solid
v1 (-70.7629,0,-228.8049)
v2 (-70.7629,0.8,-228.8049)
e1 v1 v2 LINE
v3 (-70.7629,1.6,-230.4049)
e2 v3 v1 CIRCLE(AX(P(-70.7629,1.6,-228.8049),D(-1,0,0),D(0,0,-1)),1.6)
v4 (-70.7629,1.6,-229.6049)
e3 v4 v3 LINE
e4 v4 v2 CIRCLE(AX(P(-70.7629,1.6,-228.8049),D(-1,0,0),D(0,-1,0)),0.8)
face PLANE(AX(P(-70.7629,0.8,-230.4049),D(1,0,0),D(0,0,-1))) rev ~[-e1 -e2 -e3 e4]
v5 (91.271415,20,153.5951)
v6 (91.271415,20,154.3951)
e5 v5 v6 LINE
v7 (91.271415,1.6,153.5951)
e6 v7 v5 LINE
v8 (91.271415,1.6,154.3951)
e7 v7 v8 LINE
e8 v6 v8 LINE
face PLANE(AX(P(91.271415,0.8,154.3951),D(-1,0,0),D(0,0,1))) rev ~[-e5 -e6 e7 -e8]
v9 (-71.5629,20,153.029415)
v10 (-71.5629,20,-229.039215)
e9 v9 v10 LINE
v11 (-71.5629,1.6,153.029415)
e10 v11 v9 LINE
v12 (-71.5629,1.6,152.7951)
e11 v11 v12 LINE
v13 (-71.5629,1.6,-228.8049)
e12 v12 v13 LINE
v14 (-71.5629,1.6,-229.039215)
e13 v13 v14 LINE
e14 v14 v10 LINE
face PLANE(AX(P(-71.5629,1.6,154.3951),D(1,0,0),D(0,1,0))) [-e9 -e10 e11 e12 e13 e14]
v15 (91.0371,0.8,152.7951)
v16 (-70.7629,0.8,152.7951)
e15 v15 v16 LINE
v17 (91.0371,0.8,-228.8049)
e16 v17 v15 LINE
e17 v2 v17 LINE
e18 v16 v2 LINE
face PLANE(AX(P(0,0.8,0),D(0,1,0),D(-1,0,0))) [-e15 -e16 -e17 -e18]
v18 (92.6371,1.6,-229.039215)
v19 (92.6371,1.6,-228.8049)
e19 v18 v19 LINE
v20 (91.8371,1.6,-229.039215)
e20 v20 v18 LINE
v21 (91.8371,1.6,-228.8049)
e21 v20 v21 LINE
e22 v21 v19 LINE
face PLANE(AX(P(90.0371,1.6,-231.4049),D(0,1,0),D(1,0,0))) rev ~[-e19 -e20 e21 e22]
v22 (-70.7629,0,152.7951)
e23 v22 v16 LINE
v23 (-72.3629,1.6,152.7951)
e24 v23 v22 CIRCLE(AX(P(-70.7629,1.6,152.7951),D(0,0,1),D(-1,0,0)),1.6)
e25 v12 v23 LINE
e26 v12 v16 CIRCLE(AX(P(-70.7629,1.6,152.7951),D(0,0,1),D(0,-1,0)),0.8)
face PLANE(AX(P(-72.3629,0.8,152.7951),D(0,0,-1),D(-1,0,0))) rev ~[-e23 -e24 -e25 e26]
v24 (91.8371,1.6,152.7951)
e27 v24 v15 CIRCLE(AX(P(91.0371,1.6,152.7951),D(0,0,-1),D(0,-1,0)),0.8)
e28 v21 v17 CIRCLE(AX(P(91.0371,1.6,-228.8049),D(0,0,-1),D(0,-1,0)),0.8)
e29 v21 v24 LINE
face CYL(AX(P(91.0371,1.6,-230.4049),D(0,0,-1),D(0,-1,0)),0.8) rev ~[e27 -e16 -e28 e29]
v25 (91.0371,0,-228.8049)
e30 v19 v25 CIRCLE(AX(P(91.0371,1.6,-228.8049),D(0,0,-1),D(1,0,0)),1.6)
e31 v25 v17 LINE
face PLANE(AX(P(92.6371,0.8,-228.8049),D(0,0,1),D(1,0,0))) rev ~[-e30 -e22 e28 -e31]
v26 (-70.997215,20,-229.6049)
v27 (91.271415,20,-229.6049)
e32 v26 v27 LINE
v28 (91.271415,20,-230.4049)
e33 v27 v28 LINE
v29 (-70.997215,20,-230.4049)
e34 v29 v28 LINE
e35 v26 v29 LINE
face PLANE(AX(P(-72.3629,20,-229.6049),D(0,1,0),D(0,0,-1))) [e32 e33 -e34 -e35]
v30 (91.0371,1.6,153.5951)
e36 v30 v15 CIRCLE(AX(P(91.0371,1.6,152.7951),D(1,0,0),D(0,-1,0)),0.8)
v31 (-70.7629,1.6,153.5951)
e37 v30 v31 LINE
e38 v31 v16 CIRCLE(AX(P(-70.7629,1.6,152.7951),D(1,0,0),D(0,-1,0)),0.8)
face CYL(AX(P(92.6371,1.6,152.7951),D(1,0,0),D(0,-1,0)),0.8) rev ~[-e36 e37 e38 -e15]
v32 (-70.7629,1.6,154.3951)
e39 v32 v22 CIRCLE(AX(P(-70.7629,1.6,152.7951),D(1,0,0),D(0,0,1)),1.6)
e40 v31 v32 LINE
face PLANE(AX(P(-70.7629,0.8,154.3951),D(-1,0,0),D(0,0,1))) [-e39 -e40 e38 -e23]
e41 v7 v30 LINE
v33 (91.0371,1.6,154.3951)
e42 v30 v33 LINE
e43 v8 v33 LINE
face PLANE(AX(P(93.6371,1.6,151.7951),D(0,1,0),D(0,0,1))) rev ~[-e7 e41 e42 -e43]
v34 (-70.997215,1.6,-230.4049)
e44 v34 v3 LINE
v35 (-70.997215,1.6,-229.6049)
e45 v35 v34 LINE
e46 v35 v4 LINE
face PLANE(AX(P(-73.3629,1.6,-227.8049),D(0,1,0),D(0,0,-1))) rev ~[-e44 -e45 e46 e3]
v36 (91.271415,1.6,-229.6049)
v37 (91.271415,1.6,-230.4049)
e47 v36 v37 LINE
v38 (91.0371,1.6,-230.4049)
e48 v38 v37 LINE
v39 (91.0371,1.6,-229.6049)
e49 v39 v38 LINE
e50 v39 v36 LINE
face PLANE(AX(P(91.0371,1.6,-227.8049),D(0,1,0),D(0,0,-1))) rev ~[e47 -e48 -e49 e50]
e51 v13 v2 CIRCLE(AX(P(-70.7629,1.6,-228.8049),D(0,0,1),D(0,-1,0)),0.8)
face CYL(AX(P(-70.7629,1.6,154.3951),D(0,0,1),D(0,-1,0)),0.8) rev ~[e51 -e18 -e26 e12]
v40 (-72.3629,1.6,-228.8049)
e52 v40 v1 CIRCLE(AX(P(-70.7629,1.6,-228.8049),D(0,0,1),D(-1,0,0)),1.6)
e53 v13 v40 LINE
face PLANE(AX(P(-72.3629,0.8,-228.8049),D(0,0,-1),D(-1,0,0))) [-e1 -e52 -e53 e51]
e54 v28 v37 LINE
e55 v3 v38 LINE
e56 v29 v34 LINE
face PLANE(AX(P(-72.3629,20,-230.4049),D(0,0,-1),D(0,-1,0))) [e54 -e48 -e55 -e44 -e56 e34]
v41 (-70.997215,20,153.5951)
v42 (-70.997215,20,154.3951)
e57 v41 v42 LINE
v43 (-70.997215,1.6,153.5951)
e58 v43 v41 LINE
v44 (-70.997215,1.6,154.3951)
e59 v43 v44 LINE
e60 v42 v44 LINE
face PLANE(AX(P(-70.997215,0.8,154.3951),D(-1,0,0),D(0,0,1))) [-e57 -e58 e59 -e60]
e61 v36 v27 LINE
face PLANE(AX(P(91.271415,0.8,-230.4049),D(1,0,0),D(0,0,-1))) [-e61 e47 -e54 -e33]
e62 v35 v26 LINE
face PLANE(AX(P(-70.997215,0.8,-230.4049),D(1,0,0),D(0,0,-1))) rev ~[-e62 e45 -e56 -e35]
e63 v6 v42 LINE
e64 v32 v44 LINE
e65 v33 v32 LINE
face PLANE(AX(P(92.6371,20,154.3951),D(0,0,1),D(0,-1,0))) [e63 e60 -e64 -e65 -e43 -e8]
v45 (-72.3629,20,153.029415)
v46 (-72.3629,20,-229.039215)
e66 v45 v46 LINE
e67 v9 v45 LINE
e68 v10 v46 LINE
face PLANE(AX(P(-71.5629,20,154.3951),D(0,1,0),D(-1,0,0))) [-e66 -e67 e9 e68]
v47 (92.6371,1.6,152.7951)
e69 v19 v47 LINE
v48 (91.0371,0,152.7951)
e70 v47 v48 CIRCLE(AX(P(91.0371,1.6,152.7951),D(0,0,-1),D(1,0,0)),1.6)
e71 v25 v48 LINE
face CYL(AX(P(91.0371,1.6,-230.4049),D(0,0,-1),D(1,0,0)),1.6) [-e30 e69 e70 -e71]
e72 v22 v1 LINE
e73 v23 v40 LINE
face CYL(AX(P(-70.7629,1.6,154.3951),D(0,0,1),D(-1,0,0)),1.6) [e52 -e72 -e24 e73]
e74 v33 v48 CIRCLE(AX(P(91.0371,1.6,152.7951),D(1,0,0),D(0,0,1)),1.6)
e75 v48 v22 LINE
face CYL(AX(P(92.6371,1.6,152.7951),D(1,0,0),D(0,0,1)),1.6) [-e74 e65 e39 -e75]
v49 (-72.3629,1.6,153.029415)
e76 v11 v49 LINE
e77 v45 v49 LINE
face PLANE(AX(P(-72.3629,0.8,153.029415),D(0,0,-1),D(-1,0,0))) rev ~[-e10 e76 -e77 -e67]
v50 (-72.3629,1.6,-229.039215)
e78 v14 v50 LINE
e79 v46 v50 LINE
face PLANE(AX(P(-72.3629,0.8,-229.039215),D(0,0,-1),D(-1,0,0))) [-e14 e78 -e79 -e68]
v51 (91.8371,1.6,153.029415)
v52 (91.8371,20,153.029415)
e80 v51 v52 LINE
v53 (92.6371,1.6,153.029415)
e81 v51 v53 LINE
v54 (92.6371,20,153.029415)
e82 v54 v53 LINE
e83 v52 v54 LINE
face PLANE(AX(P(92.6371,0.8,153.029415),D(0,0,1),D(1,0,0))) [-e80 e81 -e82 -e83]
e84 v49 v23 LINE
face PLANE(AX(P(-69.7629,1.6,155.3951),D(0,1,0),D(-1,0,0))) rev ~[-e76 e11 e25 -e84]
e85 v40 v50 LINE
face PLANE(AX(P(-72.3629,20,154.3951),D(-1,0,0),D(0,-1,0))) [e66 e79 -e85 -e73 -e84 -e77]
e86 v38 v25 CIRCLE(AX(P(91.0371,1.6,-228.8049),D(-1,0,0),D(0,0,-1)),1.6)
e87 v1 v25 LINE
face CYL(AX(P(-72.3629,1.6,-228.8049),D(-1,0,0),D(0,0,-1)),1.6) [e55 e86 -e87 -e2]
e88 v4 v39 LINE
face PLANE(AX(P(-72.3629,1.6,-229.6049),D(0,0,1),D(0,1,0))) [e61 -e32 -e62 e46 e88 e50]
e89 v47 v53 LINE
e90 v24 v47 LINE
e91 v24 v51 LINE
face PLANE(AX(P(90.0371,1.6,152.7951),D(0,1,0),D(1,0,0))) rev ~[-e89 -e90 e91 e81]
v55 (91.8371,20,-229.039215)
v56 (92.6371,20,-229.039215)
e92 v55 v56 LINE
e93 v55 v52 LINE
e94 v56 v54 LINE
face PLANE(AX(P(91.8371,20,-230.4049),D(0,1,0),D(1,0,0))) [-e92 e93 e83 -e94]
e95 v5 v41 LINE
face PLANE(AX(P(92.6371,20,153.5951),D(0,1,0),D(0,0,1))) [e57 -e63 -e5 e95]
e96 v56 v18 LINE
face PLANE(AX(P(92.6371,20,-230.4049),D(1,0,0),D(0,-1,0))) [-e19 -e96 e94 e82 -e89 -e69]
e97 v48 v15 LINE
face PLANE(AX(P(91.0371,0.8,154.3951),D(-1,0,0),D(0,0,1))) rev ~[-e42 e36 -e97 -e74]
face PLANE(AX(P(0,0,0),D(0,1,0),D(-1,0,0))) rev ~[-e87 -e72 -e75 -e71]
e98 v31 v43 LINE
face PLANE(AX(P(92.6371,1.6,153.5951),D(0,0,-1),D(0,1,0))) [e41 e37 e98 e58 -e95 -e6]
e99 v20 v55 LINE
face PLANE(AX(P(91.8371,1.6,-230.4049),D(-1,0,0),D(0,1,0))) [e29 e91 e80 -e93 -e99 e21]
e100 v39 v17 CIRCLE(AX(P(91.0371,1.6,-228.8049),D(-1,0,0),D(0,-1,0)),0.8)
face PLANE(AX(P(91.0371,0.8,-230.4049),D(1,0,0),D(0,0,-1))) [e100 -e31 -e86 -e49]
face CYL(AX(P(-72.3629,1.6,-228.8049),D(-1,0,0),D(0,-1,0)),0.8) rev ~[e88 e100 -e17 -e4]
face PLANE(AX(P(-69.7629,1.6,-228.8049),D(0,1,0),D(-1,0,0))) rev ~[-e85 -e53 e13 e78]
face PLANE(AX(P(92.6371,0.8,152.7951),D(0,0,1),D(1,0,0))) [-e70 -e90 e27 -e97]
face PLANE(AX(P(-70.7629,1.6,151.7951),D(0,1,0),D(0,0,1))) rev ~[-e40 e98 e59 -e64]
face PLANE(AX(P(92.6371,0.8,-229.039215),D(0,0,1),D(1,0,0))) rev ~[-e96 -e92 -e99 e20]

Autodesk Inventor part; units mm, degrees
ref_plane "YZ Plane" through (0, 0, 0) normal (1, 0, 0) x (0, 1, 0)
ref_plane "XZ Plane" through (0, 0, 0) normal (0, 1, 0) x (-1, 0, 0)
ref_plane "XY Plane" through (0, 0, 0) normal (0, 0, 1) x (1, 0, 0)
sketch "Sketch1" plane through (0, 0, 0) normal (0, 1, 0) x (-1, 0, 0)
  line L0 (72.3629, 154.3951) -> (-92.6371, 154.3951)
  line L1 (-92.6371, 154.3951) -> (-92.6371, -230.4049)
  line L2 (-92.6371, -230.4049) -> (72.3629, -230.4049)
  line L3 (72.3629, -230.4049) -> (72.3629, 154.3951)
  point P0 (0, 0)
  dimension "d0" = 165
  dimension "d1" = 384.8
extrude "Plate1" add sketch "Sketch1" along normal blind 0.8
sketch "Sketch2" plane through (92.6371, 0, 153.5951) normal (0, 0, 1) x (1, 0, 0)
  line L0 (-165, 0) -> (0, 0)
  line L1 (0, 0) -> (0, 20)
  line L2 (0, 20) -> (-165, 20)
  line L3 (-165, 20) -> (-165, 0)
edge flange "Flange1" height 20 angle 90 thickness 0.8 bend radius 0.8 thickness toward (0, 0, 1) relief tear relief width 0.8 relief depth 0.4 corner gap 0.8 corner form 2 edges at (10.1371, 0.8, 154.3951) (-72.3629, 0.8, -38.0049) (92.6371, 0.8, -38.0049) (10.1371, 0.8, -230.4049) wall of the first edge with corners at (-72.3629, 0, 153.5951) (92.6371, 0, 153.5951) (92.6371, 20, 153.5951) (-72.3629, 20, 153.5951)
bend "Bend1"
corner "Corner1"
equation "\"d2\" = Thickness"
equation "\"d3\" = BendReliefWidth"
equation "\"d4\" = BendReliefDepth"
equation "\"d5\" = MinimumRemnant"
equation "\"d6\" = TransitionRadius"
equation "\"d9\" = BendRadius"
equation "\"d10\" = CornerReliefSize"
equation "\"d11\" = GapSize"
equation "\"d12\" = JacobiRadiusSize"
equation "\"BendRadius\" = Thickness"
equation "\"BendReliefWidth\" = Thickness"
equation "\"BendReliefDepth\" = 0.5 * Thickness"
equation "\"CornerReliefSize\" = 4 * Thickness"
equation "\"MinimumRemnant\" = 2 * Thickness"
equation "\"TransitionRadius\" = BendRadius"
equation "\"JacobiRadiusSize\" = BendRadius"
equation "\"GapSize\" = Thickness"
equation "\"Thickness\" = 0.8"
properties part number "Back_plate"
